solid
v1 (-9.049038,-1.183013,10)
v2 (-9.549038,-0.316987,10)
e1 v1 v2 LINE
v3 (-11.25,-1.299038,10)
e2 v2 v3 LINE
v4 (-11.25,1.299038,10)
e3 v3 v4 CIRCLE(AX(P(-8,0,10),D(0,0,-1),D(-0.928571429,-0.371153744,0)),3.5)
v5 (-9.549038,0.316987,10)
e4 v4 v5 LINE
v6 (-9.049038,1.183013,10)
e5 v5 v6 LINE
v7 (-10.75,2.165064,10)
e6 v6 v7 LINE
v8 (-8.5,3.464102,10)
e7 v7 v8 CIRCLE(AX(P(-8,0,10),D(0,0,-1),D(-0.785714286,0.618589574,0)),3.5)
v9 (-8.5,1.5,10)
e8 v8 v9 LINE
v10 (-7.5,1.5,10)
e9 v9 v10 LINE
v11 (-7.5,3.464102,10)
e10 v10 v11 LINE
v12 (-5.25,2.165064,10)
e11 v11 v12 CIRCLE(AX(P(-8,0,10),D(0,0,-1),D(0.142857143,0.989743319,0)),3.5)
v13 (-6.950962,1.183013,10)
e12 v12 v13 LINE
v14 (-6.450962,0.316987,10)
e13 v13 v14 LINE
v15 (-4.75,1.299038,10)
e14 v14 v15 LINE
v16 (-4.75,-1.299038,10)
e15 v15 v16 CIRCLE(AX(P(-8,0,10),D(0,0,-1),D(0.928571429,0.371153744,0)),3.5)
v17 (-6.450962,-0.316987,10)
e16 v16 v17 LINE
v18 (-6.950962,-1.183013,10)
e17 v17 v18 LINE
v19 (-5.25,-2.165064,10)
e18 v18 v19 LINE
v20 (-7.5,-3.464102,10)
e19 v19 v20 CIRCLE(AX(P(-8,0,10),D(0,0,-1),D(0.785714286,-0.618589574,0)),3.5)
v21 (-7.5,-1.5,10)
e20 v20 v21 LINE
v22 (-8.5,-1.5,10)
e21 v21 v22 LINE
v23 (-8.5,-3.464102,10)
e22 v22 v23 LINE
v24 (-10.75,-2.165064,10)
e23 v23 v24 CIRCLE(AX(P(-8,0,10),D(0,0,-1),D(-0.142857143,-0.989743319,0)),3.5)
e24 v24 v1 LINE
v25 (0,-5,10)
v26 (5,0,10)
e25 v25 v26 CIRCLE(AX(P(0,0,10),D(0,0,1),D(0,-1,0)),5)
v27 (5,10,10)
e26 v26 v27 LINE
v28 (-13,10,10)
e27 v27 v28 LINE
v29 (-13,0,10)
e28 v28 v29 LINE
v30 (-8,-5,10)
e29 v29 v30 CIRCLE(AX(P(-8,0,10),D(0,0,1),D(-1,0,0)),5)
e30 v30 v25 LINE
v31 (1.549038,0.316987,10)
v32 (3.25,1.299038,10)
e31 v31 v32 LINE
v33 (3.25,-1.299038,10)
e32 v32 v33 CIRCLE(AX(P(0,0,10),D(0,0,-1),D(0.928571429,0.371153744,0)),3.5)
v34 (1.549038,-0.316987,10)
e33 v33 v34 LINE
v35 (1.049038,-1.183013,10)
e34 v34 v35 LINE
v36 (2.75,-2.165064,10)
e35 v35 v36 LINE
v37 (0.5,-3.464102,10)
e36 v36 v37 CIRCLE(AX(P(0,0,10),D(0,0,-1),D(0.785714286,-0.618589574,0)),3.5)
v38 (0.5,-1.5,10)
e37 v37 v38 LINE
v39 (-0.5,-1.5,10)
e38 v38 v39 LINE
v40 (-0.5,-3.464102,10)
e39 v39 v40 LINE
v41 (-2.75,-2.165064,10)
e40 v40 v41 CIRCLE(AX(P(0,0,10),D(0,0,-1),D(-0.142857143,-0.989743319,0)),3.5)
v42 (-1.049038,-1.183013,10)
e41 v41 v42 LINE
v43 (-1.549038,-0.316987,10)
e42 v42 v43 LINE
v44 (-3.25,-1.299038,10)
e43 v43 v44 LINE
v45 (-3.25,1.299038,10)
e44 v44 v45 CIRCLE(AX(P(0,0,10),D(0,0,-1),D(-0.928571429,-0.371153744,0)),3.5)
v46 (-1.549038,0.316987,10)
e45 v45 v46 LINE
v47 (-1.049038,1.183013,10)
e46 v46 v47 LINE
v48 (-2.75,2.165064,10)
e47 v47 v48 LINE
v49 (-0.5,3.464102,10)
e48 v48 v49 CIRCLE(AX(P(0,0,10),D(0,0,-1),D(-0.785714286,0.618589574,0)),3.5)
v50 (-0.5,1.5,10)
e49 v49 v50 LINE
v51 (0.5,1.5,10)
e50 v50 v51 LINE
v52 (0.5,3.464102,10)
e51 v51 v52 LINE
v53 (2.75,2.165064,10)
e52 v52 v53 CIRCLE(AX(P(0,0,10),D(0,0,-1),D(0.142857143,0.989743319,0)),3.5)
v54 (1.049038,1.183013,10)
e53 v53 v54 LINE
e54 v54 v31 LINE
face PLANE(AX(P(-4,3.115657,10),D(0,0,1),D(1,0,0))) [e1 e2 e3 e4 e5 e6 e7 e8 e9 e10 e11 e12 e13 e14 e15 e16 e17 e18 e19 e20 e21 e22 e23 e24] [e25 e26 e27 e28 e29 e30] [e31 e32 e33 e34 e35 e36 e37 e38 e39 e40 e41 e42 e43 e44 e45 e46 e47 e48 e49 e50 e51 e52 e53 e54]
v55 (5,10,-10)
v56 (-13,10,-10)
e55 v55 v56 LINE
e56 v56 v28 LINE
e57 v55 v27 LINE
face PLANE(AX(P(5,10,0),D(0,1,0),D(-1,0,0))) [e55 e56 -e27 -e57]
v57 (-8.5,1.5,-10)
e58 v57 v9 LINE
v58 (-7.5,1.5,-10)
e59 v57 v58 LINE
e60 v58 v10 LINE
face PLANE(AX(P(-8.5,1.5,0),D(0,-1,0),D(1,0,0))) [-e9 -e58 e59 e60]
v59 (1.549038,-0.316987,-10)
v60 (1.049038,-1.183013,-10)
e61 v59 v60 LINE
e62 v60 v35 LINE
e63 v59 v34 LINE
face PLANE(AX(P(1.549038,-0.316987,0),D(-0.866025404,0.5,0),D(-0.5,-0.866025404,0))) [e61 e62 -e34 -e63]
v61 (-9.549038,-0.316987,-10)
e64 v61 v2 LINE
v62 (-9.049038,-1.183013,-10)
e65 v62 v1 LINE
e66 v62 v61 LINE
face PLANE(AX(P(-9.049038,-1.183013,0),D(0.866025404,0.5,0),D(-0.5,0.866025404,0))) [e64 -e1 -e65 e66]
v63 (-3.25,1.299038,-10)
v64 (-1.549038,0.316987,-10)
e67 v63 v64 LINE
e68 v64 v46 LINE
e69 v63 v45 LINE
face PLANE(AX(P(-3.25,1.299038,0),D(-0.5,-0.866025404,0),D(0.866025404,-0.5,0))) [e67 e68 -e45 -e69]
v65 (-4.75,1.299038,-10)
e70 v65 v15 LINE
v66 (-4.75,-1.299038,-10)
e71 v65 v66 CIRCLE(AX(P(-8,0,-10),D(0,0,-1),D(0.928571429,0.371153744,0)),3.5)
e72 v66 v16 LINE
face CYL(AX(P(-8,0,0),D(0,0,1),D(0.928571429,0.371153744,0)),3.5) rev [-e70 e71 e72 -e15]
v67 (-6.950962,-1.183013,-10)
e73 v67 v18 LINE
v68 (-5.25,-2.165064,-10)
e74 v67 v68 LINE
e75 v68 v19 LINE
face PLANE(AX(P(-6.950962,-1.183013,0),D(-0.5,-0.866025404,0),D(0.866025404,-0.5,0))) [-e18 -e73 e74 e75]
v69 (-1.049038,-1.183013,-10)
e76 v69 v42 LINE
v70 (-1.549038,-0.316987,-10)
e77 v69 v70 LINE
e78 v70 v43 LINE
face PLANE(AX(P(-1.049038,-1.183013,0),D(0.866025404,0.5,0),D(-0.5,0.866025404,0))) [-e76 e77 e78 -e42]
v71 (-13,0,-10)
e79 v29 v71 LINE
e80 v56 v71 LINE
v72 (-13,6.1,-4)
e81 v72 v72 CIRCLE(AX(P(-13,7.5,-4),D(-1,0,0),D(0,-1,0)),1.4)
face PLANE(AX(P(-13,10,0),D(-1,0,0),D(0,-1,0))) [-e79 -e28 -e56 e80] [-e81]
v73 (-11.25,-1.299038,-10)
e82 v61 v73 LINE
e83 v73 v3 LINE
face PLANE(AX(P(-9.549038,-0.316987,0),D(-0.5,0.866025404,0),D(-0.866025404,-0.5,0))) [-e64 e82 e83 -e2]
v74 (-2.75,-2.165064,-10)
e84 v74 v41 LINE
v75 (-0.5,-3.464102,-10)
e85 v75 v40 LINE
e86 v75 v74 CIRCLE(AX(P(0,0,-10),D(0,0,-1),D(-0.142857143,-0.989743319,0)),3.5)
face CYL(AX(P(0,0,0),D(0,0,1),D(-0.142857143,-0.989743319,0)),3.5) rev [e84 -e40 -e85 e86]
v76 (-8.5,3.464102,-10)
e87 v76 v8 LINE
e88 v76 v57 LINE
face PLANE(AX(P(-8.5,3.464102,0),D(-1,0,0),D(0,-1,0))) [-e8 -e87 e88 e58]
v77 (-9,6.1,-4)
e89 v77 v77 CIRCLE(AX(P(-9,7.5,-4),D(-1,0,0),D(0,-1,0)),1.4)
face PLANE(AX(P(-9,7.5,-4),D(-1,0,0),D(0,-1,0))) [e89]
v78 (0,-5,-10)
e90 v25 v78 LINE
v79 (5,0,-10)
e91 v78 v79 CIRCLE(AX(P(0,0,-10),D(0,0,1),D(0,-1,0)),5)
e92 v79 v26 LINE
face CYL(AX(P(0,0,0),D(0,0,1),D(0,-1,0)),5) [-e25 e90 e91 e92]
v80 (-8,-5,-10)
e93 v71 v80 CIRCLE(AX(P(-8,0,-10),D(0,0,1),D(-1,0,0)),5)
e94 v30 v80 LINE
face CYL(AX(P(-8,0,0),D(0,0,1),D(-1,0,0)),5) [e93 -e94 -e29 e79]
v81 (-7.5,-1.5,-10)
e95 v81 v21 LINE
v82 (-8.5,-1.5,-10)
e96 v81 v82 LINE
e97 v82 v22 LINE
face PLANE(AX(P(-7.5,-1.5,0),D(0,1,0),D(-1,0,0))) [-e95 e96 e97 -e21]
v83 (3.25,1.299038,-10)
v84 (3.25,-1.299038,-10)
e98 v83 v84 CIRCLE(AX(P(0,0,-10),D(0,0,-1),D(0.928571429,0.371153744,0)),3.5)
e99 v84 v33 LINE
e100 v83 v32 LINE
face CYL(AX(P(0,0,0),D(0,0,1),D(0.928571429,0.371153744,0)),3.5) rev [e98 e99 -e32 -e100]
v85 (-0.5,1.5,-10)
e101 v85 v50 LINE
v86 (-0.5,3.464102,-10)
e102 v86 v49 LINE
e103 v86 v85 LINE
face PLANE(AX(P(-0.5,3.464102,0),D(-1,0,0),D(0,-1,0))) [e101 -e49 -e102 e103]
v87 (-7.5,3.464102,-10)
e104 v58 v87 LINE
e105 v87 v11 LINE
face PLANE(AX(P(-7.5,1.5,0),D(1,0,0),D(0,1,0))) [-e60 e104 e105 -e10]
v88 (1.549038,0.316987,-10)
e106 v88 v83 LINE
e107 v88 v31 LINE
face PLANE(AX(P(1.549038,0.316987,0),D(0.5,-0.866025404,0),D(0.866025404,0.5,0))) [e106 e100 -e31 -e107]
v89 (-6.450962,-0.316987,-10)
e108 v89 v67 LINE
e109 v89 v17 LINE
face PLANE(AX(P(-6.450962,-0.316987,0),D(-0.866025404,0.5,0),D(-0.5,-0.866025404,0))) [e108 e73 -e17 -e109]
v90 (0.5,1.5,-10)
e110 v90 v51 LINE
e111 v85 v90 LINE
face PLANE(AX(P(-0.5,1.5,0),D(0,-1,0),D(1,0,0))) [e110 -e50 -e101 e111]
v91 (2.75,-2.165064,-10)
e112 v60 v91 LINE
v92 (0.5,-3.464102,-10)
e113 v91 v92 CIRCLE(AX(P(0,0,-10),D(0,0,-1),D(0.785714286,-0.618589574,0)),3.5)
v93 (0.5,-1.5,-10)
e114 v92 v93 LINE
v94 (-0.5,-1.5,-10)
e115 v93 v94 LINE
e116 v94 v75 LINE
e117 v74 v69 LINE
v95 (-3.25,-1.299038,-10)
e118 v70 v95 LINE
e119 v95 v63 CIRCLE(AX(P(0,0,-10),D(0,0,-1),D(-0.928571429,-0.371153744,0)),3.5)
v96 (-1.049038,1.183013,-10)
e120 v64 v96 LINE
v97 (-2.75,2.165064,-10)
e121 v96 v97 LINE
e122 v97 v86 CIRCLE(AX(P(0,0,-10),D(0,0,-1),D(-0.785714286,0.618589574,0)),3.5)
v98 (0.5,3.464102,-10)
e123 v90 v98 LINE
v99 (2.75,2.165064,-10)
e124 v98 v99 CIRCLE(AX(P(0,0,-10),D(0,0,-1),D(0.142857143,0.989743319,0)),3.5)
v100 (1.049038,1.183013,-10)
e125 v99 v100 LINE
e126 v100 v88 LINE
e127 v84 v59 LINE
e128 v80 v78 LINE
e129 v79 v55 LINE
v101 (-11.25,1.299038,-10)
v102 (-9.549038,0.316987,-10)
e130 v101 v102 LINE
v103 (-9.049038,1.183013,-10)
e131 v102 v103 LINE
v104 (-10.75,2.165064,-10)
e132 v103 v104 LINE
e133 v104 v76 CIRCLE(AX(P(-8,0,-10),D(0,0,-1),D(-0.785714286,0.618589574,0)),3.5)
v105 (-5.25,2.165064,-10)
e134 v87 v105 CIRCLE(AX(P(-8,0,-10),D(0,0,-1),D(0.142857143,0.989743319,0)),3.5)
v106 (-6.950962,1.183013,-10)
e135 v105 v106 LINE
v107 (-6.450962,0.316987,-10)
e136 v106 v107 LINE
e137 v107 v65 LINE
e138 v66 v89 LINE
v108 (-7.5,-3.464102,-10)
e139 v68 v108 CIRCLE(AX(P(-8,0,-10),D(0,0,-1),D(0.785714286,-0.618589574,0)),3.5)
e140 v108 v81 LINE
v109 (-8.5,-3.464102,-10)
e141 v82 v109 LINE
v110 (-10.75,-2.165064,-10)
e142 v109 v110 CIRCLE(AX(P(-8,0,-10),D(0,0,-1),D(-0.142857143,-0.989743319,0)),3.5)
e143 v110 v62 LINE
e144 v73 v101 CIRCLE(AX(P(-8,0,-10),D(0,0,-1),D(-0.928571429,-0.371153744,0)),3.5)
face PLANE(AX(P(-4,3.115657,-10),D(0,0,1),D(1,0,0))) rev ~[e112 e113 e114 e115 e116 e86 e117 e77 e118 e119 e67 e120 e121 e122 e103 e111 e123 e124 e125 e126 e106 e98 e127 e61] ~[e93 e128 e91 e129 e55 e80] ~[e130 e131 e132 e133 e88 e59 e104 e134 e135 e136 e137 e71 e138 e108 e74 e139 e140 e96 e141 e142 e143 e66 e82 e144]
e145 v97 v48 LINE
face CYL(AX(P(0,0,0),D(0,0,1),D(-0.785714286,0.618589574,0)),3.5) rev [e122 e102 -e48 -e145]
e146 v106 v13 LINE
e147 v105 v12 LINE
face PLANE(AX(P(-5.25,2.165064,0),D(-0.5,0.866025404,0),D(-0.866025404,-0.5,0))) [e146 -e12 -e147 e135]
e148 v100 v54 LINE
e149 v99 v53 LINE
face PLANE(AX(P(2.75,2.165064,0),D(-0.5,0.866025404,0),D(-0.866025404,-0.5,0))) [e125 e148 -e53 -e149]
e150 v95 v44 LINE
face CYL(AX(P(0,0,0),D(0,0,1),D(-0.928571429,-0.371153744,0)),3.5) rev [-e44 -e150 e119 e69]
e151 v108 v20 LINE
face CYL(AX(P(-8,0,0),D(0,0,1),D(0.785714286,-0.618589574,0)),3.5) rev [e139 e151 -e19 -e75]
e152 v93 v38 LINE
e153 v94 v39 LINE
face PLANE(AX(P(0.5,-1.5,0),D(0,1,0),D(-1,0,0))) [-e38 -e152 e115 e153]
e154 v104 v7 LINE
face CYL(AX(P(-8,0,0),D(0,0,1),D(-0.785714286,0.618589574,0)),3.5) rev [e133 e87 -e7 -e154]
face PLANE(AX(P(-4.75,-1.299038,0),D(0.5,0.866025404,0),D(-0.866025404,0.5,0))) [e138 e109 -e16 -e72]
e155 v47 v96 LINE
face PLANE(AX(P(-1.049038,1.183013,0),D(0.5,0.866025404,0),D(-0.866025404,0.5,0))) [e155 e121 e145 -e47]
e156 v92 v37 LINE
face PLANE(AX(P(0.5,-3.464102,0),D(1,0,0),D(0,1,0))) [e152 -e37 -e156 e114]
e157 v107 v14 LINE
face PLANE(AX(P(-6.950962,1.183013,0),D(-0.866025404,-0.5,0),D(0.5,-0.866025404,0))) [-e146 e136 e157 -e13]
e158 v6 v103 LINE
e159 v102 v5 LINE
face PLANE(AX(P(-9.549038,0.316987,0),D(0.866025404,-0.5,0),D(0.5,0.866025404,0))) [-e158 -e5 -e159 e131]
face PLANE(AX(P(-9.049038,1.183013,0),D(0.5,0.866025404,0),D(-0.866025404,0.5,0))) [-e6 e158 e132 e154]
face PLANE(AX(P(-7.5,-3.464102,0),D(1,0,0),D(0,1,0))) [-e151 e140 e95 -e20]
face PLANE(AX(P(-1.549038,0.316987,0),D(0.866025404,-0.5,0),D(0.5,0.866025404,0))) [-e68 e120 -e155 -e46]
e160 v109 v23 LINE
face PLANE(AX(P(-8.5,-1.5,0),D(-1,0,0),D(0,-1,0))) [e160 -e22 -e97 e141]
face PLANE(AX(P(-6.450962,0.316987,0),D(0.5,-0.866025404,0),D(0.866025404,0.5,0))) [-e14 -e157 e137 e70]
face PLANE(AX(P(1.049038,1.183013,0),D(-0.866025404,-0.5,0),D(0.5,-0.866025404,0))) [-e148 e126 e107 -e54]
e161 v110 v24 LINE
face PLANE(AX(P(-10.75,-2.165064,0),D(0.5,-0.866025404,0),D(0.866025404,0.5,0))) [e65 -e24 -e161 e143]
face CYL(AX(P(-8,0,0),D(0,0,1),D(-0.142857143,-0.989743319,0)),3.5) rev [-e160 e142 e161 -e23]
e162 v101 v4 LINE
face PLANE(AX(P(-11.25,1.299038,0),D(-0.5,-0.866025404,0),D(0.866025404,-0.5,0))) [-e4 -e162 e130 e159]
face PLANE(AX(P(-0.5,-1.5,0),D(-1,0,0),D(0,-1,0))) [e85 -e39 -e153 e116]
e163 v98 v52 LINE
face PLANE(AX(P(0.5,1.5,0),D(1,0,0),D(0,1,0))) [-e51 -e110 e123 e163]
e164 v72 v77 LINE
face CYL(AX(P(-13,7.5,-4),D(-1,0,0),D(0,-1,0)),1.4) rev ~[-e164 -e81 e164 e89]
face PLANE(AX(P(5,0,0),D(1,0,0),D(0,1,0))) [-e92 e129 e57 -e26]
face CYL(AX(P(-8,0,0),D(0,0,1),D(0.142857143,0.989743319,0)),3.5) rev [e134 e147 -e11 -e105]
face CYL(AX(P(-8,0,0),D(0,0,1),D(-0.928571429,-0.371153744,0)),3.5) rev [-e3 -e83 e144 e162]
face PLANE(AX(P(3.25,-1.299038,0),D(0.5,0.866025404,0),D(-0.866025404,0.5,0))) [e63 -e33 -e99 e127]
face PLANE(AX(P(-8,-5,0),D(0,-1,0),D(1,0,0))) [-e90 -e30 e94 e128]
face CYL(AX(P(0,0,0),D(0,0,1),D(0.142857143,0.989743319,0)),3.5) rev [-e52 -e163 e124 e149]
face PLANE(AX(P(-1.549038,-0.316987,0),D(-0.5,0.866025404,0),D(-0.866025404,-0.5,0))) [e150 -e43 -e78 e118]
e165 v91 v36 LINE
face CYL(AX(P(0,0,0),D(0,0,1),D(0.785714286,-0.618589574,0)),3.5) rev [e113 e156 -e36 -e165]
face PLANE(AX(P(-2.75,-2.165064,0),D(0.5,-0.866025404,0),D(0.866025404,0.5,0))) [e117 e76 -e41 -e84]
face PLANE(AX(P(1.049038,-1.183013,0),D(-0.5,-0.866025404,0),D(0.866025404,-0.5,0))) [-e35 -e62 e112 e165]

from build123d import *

# Parameters (mm, degrees)
F1_DEPTH = 10
F2_R     = 1.4
F3_DEPTH = 4


# Not quite as in the source:
# - a feature names something its author has since deleted; it is built from what else it names


with BuildPart() as f1:
    # F0 (on Top) → F1 (new body, symmetric)
    with BuildSketch(Plane.XY):
        with BuildLine():
            ThreePointArc((0, -5), (3.5355339059, -3.5355339059), (5, 0))
            Line((5, 0), (5, 10))
            Line((5, 10), (-13, 10))
            Line((-13, 10), (-13, 0))
            ThreePointArc((-13, 0), (-11.5355339059, -3.5355339059), (-8, -5))
            Line((-8, -5), (0, -5))
        make_face()
        with BuildLine():
            ThreePointArc((-10.75, 2.1650635095), (-9.75, 3.0310889132), (-8.5, 3.4641016151))
            ThreePointArc((-8.5, 3.4641016151), (-8, 3.5), (-7.5, 3.4641016151))
            ThreePointArc((-7.5, 3.4641016151), (-6.25, 3.0310889132), (-5.25, 2.1650635095))
            Line((-5.25, 2.1650635095), (-6.9509618943, 1.1830127019))
            Line((-6.9509618943, 1.1830127019), (-6.4509618943, 0.3169872981))
            Line((-6.4509618943, 0.3169872981), (-4.75, 1.2990381057))
            ThreePointArc((-4.75, 1.2990381057), (-4.5, 0), (-4.75, -1.2990381057))
            Line((-4.75, -1.2990381057), (-6.4509618943, -0.3169872981))
            Line((-6.4509618943, -0.3169872981), (-6.9509618943, -1.1830127019))
            Line((-6.9509618943, -1.1830127019), (-5.25, -2.1650635095))
            ThreePointArc((-5.25, -2.1650635095), (-6.25, -3.0310889132), (-7.5, -3.4641016151))
            Line((-7.5, -3.4641016151), (-7.5, -1.5))
            Line((-7.5, -1.5), (-8.5, -1.5))
            Line((-8.5, -1.5), (-8.5, -3.4641016151))
            ThreePointArc((-8.5, -3.4641016151), (-9.75, -3.0310889132), (-10.75, -2.1650635095))
            Line((-10.75, -2.1650635095), (-9.0490381057, -1.1830127019))
            Line((-9.0490381057, -1.1830127019), (-9.5490381057, -0.3169872981))
            Line((-9.5490381057, -0.3169872981), (-11.25, -1.2990381057))
            ThreePointArc((-11.25, -1.2990381057), (-11.5, 0), (-11.25, 1.2990381057))
            Line((-11.25, 1.2990381057), (-9.5490381057, 0.3169872981))
            Line((-9.5490381057, 0.3169872981), (-9.0490381057, 1.1830127019))
            Line((-9.0490381057, 1.1830127019), (-10.75, 2.1650635095))
        make_face(mode=Mode.SUBTRACT)
        with BuildLine():
            ThreePointArc((-2.75, 2.1650635095), (-1.75, 3.0310889132), (-0.5, 3.4641016151))
            ThreePointArc((-0.5, 3.4641016151), (0, 3.5), (0.5, 3.4641016151))
            ThreePointArc((0.5, 3.4641016151), (1.75, 3.0310889132), (2.75, 2.1650635095))
            Line((2.75, 2.1650635095), (1.0490381057, 1.1830127019))
            Line((1.0490381057, 1.1830127019), (1.5490381057, 0.3169872981))
            Line((1.5490381057, 0.3169872981), (3.25, 1.2990381057))
            ThreePointArc((3.25, 1.2990381057), (3.5, 0), (3.25, -1.2990381057))
            Line((3.25, -1.2990381057), (1.5490381057, -0.3169872981))
            Line((1.5490381057, -0.3169872981), (1.0490381057, -1.1830127019))
            Line((1.0490381057, -1.1830127019), (2.75, -2.1650635095))
            ThreePointArc((2.75, -2.1650635095), (1.75, -3.0310889132), (0.5, -3.4641016151))
            Line((0.5, -3.4641016151), (0.5, -1.5))
            Line((0.5, -1.5), (-0.5, -1.5))
            Line((-0.5, -1.5), (-0.5, -3.4641016151))
            ThreePointArc((-0.5, -3.4641016151), (-1.75, -3.0310889132), (-2.75, -2.1650635095))
            Line((-2.75, -2.1650635095), (-1.0490381057, -1.1830127019))
            Line((-1.0490381057, -1.1830127019), (-1.5490381057, -0.3169872981))
            Line((-1.5490381057, -0.3169872981), (-3.25, -1.2990381057))
            ThreePointArc((-3.25, -1.2990381057), (-3.5, 0), (-3.25, 1.2990381057))
            Line((-3.25, 1.2990381057), (-1.5490381057, 0.3169872981))
            Line((-1.5490381057, 0.3169872981), (-1.0490381057, 1.1830127019))
            Line((-1.0490381057, 1.1830127019), (-2.75, 2.1650635095))
        make_face(mode=Mode.SUBTRACT)
        with BuildLine():
            ThreePointArc((0.5, 3.4641016151), (0, 3.5), (-0.5, 3.4641016151))
            Line((-0.5, 3.4641016151), (-0.5, 1.5))
            Line((-0.5, 1.5), (0.5, 1.5))
            Line((0.5, 1.5), (0.5, 3.4641016151))
        make_face()
        with BuildLine():
            ThreePointArc((-7.5, 3.4641016151), (-8, 3.5), (-8.5, 3.4641016151))
            Line((-8.5, 3.4641016151), (-8.5, 1.5))
            Line((-8.5, 1.5), (-7.5, 1.5))
            Line((-7.5, 1.5), (-7.5, 3.4641016151))
        make_face()
    extrude(amount=F1_DEPTH, both=True)

    # F2 (on face) → F3 (cut)
    with BuildSketch(Plane(origin=(-13, 0, 0), x_dir=(0, -1, 0), z_dir=(-1, 0, 0))):
        with Locations((-7.5, -4)):
            Circle(F2_R)
    extrude(amount=-F3_DEPTH, mode=Mode.SUBTRACT)


solid = f1.part
